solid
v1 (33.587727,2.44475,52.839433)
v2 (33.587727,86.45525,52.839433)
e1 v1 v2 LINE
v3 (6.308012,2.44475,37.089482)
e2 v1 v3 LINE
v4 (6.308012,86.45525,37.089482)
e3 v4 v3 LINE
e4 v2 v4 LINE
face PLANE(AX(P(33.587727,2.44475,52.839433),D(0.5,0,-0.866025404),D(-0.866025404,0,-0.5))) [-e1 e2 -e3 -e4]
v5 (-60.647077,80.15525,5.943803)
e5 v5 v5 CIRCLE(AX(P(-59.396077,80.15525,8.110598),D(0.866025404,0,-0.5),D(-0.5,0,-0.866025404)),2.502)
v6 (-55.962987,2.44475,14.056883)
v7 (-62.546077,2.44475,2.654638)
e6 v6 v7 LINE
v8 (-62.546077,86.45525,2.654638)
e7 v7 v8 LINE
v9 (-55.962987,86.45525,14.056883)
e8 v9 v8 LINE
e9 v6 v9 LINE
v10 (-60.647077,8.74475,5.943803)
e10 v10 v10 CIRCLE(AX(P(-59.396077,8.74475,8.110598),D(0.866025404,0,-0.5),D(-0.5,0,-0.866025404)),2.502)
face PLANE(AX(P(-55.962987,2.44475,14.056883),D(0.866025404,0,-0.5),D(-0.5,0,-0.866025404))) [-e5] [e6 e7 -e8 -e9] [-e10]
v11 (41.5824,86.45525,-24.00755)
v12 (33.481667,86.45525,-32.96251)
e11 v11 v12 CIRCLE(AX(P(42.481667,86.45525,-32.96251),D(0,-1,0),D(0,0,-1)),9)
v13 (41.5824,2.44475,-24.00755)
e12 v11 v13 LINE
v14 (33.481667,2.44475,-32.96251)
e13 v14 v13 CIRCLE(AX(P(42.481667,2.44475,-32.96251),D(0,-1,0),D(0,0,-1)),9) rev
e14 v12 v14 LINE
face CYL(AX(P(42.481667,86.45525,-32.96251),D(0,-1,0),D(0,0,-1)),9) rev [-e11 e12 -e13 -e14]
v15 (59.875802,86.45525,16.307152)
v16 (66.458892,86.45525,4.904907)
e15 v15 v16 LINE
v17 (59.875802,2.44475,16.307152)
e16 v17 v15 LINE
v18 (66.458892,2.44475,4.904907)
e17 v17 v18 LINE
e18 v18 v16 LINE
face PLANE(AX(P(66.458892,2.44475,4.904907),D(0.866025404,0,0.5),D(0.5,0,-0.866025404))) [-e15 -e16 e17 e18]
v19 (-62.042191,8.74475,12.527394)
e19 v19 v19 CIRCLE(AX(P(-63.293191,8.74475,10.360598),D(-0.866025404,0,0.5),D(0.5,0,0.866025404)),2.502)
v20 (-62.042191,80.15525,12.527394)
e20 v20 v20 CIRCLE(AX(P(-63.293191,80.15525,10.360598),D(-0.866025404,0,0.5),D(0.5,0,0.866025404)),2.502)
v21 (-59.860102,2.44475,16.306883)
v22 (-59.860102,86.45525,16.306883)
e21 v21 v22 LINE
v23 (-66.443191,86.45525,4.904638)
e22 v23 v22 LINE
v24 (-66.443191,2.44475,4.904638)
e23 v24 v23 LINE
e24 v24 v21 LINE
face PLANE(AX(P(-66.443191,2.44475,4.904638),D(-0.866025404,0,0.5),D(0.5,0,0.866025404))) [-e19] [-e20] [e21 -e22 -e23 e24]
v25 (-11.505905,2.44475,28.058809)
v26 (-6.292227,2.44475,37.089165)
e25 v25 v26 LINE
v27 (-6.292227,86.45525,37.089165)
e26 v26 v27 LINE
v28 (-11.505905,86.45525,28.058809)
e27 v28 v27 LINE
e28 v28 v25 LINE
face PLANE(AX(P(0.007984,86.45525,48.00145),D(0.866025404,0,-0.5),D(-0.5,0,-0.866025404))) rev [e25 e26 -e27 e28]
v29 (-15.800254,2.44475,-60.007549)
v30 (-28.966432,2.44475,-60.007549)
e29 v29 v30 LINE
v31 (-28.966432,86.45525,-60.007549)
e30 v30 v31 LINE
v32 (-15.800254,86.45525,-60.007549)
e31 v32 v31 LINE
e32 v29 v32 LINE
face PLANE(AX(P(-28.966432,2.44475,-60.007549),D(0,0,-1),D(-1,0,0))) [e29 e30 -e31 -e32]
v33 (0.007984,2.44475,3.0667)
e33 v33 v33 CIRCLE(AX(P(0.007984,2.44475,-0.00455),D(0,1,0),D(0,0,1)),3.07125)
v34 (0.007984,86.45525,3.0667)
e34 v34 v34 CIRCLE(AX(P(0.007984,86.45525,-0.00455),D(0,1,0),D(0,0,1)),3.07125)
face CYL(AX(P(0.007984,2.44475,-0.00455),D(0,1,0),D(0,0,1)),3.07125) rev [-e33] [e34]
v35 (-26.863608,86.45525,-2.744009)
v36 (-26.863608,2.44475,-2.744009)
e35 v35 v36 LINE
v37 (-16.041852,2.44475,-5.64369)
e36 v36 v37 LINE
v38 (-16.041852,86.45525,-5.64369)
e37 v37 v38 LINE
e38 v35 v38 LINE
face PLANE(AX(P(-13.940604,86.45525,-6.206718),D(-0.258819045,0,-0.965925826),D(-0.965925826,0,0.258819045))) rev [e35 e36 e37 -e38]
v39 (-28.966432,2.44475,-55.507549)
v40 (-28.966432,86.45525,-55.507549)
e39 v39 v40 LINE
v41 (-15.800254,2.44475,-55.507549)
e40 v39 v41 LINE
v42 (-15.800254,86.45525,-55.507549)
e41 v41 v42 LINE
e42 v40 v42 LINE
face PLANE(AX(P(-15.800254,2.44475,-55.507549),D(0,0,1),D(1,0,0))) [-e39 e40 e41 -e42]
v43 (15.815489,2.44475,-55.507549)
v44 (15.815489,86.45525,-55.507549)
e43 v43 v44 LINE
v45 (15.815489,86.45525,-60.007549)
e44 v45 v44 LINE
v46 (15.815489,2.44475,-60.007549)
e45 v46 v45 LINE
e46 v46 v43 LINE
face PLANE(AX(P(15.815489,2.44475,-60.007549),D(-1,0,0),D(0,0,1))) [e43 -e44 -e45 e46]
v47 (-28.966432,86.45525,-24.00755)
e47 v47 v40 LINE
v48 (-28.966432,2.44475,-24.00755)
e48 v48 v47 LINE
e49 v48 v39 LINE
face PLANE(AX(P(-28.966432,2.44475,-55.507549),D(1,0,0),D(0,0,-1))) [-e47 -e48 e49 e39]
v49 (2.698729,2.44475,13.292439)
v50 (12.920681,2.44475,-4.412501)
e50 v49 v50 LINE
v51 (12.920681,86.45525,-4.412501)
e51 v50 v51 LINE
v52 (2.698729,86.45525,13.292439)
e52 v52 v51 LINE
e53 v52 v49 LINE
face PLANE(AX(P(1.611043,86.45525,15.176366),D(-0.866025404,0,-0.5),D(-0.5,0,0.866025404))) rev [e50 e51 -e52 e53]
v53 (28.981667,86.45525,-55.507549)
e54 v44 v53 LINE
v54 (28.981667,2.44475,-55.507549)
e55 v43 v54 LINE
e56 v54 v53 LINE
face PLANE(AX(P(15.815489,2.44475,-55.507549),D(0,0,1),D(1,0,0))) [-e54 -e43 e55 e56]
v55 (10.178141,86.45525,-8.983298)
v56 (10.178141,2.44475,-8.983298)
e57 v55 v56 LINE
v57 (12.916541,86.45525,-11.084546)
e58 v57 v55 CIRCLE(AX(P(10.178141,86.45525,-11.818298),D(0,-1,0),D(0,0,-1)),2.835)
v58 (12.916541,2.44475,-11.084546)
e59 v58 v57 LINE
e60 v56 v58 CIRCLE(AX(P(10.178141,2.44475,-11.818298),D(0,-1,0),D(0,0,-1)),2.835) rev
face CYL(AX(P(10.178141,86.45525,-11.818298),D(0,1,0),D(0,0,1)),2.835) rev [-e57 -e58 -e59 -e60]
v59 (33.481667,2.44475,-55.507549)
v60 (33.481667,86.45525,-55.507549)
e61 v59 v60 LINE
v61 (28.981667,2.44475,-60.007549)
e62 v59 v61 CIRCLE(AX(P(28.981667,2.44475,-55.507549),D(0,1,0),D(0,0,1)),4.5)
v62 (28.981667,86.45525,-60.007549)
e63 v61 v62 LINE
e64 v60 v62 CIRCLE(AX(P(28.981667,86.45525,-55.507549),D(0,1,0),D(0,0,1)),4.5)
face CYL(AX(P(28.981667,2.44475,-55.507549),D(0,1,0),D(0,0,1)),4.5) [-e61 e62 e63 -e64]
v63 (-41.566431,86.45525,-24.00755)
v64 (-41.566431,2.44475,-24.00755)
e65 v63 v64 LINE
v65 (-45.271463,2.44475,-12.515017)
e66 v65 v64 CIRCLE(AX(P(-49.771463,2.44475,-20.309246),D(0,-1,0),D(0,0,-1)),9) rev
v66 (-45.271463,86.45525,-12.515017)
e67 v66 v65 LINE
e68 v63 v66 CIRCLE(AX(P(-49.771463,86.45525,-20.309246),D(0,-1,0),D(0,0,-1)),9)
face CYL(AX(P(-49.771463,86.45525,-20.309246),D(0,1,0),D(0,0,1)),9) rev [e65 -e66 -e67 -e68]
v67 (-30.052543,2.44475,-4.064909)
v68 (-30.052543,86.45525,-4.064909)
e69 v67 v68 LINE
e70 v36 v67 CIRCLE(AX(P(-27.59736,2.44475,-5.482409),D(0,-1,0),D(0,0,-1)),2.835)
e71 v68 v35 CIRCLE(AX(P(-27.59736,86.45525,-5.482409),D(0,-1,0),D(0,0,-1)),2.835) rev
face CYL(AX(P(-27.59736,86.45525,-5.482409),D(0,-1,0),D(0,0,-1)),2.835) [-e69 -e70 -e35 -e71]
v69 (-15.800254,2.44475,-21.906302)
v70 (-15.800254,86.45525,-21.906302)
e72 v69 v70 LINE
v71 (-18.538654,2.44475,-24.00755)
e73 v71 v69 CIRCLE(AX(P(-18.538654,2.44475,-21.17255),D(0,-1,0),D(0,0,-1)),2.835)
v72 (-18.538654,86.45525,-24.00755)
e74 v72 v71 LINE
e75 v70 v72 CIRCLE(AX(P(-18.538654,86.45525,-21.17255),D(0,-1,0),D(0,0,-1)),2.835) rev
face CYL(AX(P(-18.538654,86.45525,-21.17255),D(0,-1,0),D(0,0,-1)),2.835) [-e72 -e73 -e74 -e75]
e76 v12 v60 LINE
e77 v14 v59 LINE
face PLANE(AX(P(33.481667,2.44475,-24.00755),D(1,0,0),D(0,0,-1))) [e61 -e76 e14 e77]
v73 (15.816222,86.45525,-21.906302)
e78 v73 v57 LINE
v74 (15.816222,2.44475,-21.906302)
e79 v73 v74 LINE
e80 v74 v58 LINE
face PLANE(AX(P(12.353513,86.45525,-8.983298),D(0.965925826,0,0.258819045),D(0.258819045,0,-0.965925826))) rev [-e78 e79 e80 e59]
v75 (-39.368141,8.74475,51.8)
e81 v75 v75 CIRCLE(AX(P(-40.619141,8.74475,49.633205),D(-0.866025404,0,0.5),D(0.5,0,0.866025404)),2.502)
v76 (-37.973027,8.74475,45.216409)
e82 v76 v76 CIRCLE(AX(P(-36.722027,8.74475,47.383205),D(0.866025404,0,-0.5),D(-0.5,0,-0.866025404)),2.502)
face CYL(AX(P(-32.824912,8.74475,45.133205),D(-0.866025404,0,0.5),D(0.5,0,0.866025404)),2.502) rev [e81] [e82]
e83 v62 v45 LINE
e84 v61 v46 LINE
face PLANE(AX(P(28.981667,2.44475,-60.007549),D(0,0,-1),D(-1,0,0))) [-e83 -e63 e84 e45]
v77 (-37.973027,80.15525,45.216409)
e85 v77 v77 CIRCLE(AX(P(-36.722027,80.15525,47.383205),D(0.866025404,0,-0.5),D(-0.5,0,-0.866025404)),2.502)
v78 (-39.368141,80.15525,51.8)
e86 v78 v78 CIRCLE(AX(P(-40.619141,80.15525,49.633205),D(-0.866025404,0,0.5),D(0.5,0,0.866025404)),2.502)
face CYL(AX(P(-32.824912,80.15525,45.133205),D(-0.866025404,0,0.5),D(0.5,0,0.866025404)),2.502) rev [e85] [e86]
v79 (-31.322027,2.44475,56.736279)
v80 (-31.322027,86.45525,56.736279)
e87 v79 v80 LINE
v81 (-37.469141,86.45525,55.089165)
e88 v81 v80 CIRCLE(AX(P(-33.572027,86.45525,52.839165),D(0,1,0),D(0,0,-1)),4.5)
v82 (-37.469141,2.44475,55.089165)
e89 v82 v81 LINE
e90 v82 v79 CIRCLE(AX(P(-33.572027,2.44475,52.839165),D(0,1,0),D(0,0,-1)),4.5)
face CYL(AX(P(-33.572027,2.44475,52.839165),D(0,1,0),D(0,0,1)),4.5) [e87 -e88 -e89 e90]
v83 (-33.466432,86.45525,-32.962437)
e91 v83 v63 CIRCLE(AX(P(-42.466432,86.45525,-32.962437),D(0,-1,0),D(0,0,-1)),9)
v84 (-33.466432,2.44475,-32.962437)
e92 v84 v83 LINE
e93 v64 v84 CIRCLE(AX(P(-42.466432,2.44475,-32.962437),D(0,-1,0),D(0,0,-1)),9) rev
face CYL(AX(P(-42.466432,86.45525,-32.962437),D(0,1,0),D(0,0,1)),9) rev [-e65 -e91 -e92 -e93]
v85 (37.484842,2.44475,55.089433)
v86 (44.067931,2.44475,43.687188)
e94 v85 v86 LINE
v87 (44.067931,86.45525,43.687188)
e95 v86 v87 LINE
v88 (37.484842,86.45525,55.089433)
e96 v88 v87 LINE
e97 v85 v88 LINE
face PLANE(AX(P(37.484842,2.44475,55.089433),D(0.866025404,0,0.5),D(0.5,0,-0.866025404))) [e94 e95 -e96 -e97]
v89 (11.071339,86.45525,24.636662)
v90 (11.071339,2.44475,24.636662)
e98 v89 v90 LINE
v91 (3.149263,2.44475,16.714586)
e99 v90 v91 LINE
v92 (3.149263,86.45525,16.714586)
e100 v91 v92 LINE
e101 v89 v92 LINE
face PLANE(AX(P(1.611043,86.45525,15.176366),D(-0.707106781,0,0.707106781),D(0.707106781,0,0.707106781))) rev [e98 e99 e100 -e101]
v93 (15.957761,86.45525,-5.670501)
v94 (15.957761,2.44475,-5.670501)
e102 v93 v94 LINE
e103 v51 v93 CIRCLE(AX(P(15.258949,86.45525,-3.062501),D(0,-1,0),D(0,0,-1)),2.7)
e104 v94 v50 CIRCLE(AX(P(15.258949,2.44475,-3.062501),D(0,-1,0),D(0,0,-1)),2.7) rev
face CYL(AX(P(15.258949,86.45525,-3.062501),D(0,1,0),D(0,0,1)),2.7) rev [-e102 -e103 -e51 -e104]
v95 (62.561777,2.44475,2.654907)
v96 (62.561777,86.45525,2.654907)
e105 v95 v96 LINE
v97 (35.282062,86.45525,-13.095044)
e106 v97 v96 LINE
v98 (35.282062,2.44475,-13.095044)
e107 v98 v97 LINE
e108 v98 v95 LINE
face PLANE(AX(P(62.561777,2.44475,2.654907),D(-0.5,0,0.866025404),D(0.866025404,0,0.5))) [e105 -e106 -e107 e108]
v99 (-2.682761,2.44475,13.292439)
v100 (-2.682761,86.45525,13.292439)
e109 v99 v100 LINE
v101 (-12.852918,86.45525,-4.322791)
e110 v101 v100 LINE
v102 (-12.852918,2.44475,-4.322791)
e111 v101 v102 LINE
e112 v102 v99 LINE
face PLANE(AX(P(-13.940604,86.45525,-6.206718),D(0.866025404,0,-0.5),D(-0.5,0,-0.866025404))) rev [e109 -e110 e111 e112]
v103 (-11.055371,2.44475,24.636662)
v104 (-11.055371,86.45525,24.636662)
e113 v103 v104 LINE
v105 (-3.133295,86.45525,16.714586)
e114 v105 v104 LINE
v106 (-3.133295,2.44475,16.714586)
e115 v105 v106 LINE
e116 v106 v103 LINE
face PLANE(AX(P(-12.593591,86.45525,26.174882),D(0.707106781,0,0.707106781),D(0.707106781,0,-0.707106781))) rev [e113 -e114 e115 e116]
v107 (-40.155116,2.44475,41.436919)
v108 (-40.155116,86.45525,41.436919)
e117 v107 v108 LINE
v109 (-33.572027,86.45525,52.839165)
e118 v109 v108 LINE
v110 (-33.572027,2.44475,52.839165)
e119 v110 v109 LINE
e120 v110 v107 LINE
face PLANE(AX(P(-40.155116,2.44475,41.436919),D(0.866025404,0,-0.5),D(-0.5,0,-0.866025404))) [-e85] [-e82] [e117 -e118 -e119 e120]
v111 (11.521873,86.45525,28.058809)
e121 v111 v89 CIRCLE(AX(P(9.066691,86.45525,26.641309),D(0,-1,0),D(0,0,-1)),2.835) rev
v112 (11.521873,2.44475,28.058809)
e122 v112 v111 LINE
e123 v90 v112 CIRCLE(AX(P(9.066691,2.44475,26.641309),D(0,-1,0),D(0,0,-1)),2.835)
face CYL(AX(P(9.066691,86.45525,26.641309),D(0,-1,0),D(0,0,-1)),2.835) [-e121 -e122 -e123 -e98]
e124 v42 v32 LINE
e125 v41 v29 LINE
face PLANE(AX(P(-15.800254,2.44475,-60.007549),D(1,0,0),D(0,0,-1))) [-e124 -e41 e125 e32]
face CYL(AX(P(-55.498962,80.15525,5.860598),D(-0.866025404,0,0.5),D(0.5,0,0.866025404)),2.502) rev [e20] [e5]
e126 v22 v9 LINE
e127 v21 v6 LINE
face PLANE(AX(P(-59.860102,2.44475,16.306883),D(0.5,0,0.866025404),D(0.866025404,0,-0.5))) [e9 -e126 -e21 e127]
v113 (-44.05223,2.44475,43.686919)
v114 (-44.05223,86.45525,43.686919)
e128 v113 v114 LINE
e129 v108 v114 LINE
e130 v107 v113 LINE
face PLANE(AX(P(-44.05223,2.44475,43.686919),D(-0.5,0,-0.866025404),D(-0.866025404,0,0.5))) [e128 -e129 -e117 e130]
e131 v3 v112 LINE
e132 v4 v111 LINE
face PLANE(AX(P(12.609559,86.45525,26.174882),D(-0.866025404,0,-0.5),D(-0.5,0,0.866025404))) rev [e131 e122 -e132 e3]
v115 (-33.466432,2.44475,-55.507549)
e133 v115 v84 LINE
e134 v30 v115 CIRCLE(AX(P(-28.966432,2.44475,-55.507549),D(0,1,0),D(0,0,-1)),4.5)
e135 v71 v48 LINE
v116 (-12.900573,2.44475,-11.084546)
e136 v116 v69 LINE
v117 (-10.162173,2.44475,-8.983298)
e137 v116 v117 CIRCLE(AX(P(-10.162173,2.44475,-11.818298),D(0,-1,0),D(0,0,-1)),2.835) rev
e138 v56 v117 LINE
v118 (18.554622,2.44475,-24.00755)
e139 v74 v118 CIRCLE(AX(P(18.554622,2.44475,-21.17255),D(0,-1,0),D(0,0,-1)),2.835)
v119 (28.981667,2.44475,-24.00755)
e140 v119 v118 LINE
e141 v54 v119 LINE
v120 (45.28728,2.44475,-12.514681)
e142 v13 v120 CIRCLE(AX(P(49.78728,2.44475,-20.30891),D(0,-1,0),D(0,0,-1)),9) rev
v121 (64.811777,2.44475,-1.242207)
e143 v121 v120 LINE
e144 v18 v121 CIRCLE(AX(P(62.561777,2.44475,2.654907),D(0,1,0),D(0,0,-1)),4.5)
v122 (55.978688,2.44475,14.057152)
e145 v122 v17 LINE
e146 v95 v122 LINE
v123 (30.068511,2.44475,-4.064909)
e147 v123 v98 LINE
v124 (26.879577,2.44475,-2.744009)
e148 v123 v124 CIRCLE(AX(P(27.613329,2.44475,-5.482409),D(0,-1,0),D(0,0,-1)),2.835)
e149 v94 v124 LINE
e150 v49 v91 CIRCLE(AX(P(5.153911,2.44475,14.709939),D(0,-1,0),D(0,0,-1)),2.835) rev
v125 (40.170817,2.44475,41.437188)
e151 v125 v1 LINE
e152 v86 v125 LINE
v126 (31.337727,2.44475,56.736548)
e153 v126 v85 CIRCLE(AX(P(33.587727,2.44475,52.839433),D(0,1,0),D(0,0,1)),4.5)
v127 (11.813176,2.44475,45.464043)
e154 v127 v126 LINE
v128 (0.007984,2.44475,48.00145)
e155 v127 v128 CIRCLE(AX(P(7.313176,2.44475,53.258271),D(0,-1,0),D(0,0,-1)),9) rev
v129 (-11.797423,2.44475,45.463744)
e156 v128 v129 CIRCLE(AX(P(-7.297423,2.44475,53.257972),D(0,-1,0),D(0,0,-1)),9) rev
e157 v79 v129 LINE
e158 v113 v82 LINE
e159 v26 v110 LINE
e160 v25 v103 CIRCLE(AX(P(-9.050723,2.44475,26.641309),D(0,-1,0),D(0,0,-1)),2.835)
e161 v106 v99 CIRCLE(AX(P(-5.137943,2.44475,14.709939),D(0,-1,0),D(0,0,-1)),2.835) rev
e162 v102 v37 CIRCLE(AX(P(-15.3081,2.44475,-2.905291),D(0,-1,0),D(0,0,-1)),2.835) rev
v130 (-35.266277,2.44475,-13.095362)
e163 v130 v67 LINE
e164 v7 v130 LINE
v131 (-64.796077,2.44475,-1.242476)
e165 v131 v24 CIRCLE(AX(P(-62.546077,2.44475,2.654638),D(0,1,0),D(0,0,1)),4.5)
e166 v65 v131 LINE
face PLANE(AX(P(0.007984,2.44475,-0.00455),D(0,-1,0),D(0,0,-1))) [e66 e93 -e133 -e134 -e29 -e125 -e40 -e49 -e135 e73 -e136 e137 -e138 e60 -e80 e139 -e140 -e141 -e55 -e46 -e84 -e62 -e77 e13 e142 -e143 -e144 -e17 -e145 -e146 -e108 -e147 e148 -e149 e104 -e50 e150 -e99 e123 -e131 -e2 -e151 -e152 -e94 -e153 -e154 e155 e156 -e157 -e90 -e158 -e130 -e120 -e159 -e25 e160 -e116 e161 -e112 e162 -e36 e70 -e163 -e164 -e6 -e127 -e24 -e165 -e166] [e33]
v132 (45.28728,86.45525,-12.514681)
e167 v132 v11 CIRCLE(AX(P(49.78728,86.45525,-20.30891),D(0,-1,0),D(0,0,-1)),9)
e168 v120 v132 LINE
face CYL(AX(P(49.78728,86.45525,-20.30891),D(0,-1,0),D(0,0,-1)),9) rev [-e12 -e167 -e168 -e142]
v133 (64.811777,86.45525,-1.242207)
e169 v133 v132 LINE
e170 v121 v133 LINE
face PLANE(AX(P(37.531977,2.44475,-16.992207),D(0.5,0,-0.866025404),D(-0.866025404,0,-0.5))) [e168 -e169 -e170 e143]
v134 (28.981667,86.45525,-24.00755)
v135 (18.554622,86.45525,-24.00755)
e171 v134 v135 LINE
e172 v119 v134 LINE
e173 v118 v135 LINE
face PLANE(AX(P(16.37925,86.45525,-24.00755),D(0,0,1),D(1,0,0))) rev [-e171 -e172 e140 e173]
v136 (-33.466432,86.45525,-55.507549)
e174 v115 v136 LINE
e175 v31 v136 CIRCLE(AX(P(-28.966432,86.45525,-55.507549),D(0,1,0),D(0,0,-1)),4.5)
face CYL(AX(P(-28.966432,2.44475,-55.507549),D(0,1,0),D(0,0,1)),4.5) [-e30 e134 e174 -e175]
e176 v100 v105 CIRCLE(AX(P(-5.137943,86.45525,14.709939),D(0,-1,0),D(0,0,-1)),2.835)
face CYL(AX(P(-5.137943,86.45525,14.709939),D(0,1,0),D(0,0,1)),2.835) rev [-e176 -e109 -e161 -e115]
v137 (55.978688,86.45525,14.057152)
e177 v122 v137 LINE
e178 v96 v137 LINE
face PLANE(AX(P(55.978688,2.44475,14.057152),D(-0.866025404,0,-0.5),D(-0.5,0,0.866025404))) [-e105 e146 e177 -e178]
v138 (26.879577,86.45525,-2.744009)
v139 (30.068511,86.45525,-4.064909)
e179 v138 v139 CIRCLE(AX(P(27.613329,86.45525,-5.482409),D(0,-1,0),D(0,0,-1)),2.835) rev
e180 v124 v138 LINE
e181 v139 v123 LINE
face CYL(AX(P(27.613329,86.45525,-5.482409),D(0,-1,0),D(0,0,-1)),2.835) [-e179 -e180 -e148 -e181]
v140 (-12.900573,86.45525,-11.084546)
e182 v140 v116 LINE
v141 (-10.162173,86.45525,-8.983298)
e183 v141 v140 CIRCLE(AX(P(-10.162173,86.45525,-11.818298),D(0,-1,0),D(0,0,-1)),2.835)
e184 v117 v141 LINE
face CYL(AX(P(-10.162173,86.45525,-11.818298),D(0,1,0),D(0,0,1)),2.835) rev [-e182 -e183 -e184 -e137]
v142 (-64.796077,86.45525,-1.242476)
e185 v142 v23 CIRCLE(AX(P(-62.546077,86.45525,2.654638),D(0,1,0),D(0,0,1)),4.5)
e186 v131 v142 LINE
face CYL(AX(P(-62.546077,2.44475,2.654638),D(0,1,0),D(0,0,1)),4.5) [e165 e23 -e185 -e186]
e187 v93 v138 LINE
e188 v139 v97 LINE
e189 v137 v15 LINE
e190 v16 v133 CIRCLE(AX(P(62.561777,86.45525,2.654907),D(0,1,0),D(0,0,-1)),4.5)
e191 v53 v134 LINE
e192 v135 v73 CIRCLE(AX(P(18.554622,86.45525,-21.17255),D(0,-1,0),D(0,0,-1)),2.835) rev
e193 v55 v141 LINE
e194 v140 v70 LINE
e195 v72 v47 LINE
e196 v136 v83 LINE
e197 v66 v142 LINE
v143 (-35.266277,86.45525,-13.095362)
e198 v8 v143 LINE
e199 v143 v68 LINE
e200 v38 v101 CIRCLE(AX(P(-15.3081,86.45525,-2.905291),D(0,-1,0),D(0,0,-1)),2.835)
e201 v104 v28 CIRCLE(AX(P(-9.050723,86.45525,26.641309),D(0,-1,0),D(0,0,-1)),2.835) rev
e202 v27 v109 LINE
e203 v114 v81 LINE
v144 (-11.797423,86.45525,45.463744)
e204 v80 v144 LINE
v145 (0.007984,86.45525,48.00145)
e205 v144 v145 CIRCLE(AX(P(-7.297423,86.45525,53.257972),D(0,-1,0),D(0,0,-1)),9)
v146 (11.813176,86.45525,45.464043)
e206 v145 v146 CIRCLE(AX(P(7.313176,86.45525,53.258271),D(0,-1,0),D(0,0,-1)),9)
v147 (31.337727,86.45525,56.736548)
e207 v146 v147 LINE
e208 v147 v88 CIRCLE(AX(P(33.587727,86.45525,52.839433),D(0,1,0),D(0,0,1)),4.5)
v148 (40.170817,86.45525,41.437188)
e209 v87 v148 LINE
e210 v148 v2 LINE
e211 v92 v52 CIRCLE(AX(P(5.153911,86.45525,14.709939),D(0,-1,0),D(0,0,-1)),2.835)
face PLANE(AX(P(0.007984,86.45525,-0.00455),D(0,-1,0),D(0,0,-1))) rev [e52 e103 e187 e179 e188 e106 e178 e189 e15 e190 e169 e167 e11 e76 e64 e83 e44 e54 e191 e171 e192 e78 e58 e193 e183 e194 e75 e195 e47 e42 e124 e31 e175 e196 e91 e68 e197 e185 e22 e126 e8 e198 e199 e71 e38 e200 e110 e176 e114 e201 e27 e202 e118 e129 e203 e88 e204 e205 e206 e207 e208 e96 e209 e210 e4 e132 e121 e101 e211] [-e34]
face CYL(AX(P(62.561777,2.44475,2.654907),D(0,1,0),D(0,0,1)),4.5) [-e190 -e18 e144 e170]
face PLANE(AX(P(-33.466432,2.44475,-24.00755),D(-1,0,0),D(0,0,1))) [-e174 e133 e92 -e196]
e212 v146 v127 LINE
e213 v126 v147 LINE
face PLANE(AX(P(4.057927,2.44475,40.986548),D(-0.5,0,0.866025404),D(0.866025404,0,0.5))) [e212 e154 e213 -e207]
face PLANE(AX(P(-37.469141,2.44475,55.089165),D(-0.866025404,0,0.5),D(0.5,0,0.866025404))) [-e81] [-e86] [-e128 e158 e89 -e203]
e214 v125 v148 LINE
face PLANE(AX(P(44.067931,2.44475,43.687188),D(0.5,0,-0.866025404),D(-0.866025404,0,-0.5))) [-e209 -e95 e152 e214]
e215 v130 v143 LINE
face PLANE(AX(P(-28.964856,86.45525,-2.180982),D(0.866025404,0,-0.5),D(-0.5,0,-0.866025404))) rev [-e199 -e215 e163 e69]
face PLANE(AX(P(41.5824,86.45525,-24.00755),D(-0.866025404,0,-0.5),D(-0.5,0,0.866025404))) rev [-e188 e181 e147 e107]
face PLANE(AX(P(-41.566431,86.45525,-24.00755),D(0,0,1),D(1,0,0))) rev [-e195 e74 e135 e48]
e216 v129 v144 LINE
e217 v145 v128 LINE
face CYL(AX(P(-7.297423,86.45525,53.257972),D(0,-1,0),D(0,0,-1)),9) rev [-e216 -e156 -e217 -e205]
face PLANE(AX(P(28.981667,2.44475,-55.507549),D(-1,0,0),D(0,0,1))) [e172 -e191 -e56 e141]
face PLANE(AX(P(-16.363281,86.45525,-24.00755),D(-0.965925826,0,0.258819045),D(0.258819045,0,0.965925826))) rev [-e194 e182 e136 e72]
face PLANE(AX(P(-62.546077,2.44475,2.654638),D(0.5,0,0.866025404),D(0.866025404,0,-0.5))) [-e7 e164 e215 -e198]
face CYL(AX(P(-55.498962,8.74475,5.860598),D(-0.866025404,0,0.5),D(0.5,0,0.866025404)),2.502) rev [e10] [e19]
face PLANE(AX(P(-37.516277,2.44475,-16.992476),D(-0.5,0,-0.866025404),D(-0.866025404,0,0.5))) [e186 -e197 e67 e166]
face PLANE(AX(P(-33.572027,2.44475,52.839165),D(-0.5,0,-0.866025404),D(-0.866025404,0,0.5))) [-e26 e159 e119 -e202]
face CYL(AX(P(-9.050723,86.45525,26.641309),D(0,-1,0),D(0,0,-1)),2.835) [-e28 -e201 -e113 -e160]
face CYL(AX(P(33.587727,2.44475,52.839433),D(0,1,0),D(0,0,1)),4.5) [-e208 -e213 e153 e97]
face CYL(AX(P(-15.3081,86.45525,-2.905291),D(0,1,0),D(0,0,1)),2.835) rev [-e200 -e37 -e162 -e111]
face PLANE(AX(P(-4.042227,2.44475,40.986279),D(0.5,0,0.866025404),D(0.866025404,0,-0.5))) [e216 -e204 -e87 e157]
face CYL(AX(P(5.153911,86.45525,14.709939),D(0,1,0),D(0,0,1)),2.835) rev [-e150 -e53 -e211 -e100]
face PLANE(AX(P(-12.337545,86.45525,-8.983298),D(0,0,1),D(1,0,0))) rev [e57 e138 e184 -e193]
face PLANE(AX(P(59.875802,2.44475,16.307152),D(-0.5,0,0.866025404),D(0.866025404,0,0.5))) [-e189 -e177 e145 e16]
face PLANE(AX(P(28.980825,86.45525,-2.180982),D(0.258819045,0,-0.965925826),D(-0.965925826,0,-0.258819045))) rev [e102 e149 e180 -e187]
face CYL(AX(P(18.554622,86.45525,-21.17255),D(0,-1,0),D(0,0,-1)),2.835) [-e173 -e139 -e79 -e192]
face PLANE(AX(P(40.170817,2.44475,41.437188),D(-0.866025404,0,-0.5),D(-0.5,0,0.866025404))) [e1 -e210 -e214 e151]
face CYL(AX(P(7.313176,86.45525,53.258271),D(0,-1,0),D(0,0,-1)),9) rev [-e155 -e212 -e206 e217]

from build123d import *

# Parameters (mm, degrees)
SALIENTE_EXTRUIR1_DEPTH = 88.9
CROQUIS4_R              = 3.25
CORTAR_EXTRUIR1_DEPTH   = 112.44204772
REDONDEO6_R             = 3
REDONDEO7_R             = 3
ESCALA2_SCALE           = 1.05
SALIENTE_EXTRUIR2_DEPTH = 93.345
REDONDEO8_R             = 10
REDONDEO9_R             = 10
REDONDEO12_R            = 10
REDONDEO13_R            = 10
REDONDEO14_R            = 10
REDONDEO16_R            = 10
REDONDEO17_R            = 3
CROQUIS20_R             = 2.78
CORTAR_EXTRUIR7_DEPTH   = 10
ESCALA3_SCALE           = 0.9


with BuildPart() as part:
    # Croquis1 → Saliente-Extruir1 (new body)
    with BuildSketch(Plane(origin=(0, 0, 0), x_dir=(1, 0, 0), z_dir=(0, 1, 0))):
        Polygon((1.696358741, -16.064461222), (13.335, -27.703102481), (0, -50.8), (-13.335, -27.703102481), (-1.696358741, -16.064461222), (-14.760410887, 6.563140847), (-30.659090512, 2.303102481), (-43.994090512, 25.4), (-17.324090512, 25.4), (-13.064052146, 9.501320374), (13.064052146, 9.501320374), (17.324090512, 25.4), (43.994090512, 25.4), (30.659090512, 2.303102481), (14.760410887, 6.563140847), align=None)
    extrude(amount=SALIENTE_EXTRUIR1_DEPTH)

    # Croquis4 → Cortar-Extruir1 (cut, through all)
    with BuildSketch(Plane(origin=(0, 88.9, 0), x_dir=(1, 0, 0), z_dir=(0, 1, 0))):
        with Locations(Location((0, 0, 0), (0, 0, 270))):
            Circle(CROQUIS4_R)
    extrude(amount=-CORTAR_EXTRUIR1_DEPTH, mode=Mode.SUBTRACT)

    # Redondeo6
    redondeo6_edges = [part.edges().sort_by_distance(p)[0] for p in [
        (-1.696358741, 44.45, 16.064461222),
        (-14.760410887, 44.45, -6.563140847),
        (-13.064052146, 44.45, -9.501320374),
        (13.064052146, 44.45, -9.501320374),
        (1.696358741, 44.45, 16.064461222),
    ]]
    fillet(redondeo6_edges, radius=REDONDEO6_R)

    # Redondeo7
    redondeo7_edges = [part.edges().sort_by_distance(p)[0] for p in [
        (-13.335, 44.45, 27.703102481),
        (-30.659090512, 44.45, -2.303102481),
        (-17.324090512, 44.45, -25.4),
        (17.324090512, 44.45, -25.4),
        (30.659090512, 44.45, -2.303102481),
        (13.335, 44.45, 27.703102481),
    ]]
    fillet(redondeo7_edges, radius=REDONDEO7_R)


with BuildPart() as part_1:
    # Escala2: scaled about (-0.00814633, 44.45, 0.003262785)
    add(part.part.scale(ESCALA2_SCALE).moved(Location((0.000407317, -2.2225, -0.000163139))))

    # Croquis9 → Saliente-Extruir2 (add, through all)
    with BuildSketch(Plane(origin=(0, 91.1225, 0), x_dir=(1, 0, 0), z_dir=(0, 1, 0))):
        with BuildLine():
            Line((-37.193388788, 26.670163139), (-37.193388788, 61.670162712))
            ThreePointArc((-37.193388788, 61.670162712), (-35.728922694, 65.205696618), (-32.193388788, 66.670162712))
            Line((-32.193388788, 66.670162712), (-17.564301381, 66.670162712))
            Line((-17.564301381, 66.670162712), (-17.564301381, 61.670162712))
            Line((-17.564301381, 61.670162712), (-32.193388788, 61.670162712))
            Line((-32.193388788, 61.670162712), (-32.193388788, 26.670163139))
            Line((-32.193388788, 26.670163139), (-37.193388788, 26.670163139))
        make_face()
        with BuildLine():
            Line((-69.504104547, -2.954490104), (-39.193215784, 14.545509683))
            Line((-39.193215784, 14.545509683), (-41.693215784, 18.875636702))
            Line((-41.693215784, 18.875636702), (-72.004104547, 1.375636915))
            ThreePointArc((-72.004104547, 1.375636915), (-74.333733678, -1.660394878), (-73.834231566, -5.454490104))
            Line((-73.834231566, -5.454490104), (-66.519687862, -18.123651433))
            Line((-66.519687862, -18.123651433), (-62.189560843, -15.623651433))
            Line((-62.189560843, -15.623651433), (-69.504104547, -2.954490104))
        make_face()
        with BuildLine():
            Line((32.193388788, 61.670162712), (32.193388788, 26.670163139))
            Line((32.193388788, 26.670163139), (37.193388788, 26.670163139))
            Line((37.193388788, 26.670163139), (37.193388788, 61.670162712))
            ThreePointArc((37.193388788, 61.670162712), (35.728922694, 65.205696618), (32.193388788, 66.670162712))
            Line((32.193388788, 66.670162712), (17.564301381, 66.670162712))
            Line((17.564301381, 66.670162712), (17.564301381, 61.670162712))
            Line((17.564301381, 61.670162712), (32.193388788, 61.670162712))
        make_face()
        with BuildLine():
            Line((39.193733196, 14.545210955), (41.693733196, 18.875337974))
            Line((41.693733196, 18.875337974), (72.004621958, 1.375338188))
            ThreePointArc((72.004621958, 1.375338188), (74.33425109, -1.660693606), (73.834748977, -5.454788831))
            Line((73.834748977, -5.454788831), (66.520205273, -18.123950161))
            Line((66.520205273, -18.123950161), (62.190078254, -15.623950161))
            Line((62.190078254, -15.623950161), (69.504621958, -2.954788831))
            Line((69.504621958, -2.954788831), (39.193733196, 14.545210955))
        make_face()
        with BuildLine():
            Line((37.31123317, -58.715373881), (7.000344407, -41.215374094))
            Line((7.000344407, -41.215374094), (4.500344407, -45.545501113))
            Line((4.500344407, -45.545501113), (34.81123317, -63.0455009))
            ThreePointArc((34.81123317, -63.0455009), (38.605328395, -63.545003012), (41.641360189, -61.215373881))
            Line((41.641360189, -61.215373881), (48.955903893, -48.546212551))
            Line((48.955903893, -48.546212551), (44.625776874, -46.046212551))
            Line((44.625776874, -46.046212551), (37.31123317, -58.715373881))
        make_face()
        with BuildLine():
            Line((-6.999826996, -41.215075367), (-4.499826996, -45.545202386))
            Line((-4.499826996, -45.545202386), (-34.810715758, -63.045202172))
            ThreePointArc((-34.810715758, -63.045202172), (-38.604810984, -63.544704284), (-41.640842777, -61.215075153))
            Line((-41.640842777, -61.215075153), (-48.955386481, -48.545913824))
            Line((-48.955386481, -48.545913824), (-44.625259462, -46.045913824))
            Line((-44.625259462, -46.045913824), (-37.310715758, -58.715075153))
            Line((-37.310715758, -58.715075153), (-6.999826996, -41.215075367))
        make_face()
    extrude(amount=-SALIENTE_EXTRUIR2_DEPTH)

    # Redondeo8
    # the kernel refuses this fillet: 10 mm, written as the material it adds along each edge
    with BuildSketch(Plane(origin=(-37.193388788, 91.1225, -26.670163139), x_dir=(-1, 0, 0), z_dir=(0, -1, 0))) as redondeo8_piece_1_section:
        with BuildLine():
            CenterArc((10, 9.949874264), REDONDEO8_R, 180, 84.260823378)
            Line((0, 9.949874264), (-0.2, 9.949874264))
            Line((-0.2, 9.949874264), (-0.2, 0))
            Line((-0.2, 0), (0, -0.2))
            ThreePointArc((0, -0.2), (4.499999466, -0.2), (8.979998912, -0.198997485))
            Line((8.979998912, -0.198997485), (8.999998933, 0))
        make_face()
    redondeo8_piece_1 = extrude(amount=93.345, mode=Mode.PRIVATE)
    redondeo8_piece_1 = split(redondeo8_piece_1, bisect_by=Plane(origin=(-45.471806186, 44.45, -25.420347259), z_dir=(0.8660254037844427, 0, -0.49999999999999306)), keep=Keep.TOP, mode=Mode.PRIVATE)
    add(redondeo8_piece_1)

    # Redondeo9
    # the kernel refuses this fillet: 10 mm, written as the material it adds along each edge
    with BuildSketch(Plane(origin=(37.193388788, 91.1225, -26.670163139), x_dir=(0, 0, -1), z_dir=(0, -1, 0))) as redondeo9_piece_1_section:
        with BuildLine():
            CenterArc((9.949956104, 10), REDONDEO9_R, 185.734485624, 84.265514376)
            Line((0, 9.000813566), (-0.198999122, 8.980829837))
            ThreePointArc((-0.198999122, 8.980829837), (-0.2, 4.500406783), (-0.2, 0))
            Line((-0.2, 0), (0, -0.2))
            Line((0, -0.2), (9.949956104, -0.2))
            Line((9.949956104, -0.2), (9.949956104, 0))
        make_face()
    redondeo9_piece_1 = extrude(amount=93.345, mode=Mode.PRIVATE)
    redondeo9_piece_1 = split(redondeo9_piece_1, bisect_by=Plane(origin=(45.472441412, 44.45, -25.420036516), z_dir=(-0.8660254037844312, 0, -0.5000000000000131)), keep=Keep.TOP, mode=Mode.PRIVATE)
    add(redondeo9_piece_1)

    # Redondeo12
    # the kernel refuses this fillet: 10 mm, written as the material it adds along each edge
    with BuildSketch(Plane(origin=(4.500437971, 91.1225, 45.545555132), x_dir=(0.8660254037844384, 0, 0.5000000000000003), z_dir=(0, -1, 0))) as redondeo12_piece_1_section:
        with BuildLine():
            CenterArc((9.949880533, 10), REDONDEO12_R, 185.738817437, 84.261182563)
            Line((0, 9.000061308), (-0.198997611, 8.980062535))
            ThreePointArc((-0.198997611, 8.980062535), (-0.2, 4.500030654), (-0.2, 0))
            Line((-0.2, 0), (0, -0.2))
            Line((0, -0.2), (9.949880533, -0.2))
            Line((9.949880533, -0.2), (9.949880533, 0))
        make_face()
    redondeo12_piece_1 = extrude(amount=93.345, mode=Mode.PRIVATE)
    redondeo12_piece_1 = split(redondeo12_piece_1, bisect_by=Plane(origin=(-0.721187955, 44.45, 52.089997188), z_dir=(0.8660254037844385, 0, -0.5000000000000004)), keep=Keep.TOP, mode=Mode.PRIVATE)
    add(redondeo12_piece_1)

    # Redondeo13
    # the kernel refuses this fillet: 10 mm, written as the material it adds along each edge
    with BuildSketch(Plane(origin=(41.693826759, 91.1225, -18.875283955), x_dir=(0.500000000000013, 0, -0.8660254037844312), z_dir=(0, -1, 0))) as redondeo13_piece_1_section:
        with BuildLine():
            CenterArc((10, 9.94994984), REDONDEO13_R, 180, 84.265155193)
            Line((0, 9.94994984), (-0.2, 9.94994984))
            Line((-0.2, 9.94994984), (-0.2, 0))
            Line((-0.2, 0), (0, -0.2))
            ThreePointArc((0, -0.2), (4.500375595, -0.2), (8.980766214, -0.198998997))
            Line((8.980766214, -0.198998997), (9.00075119, 0))
        make_face()
    redondeo13_piece_1 = extrude(amount=93.345, mode=Mode.PRIVATE)
    redondeo13_piece_1 = redondeo13_piece_1 - Plane(origin=(47.193388788, 44.45, -36.620119243), x_dir=(0, 0, -1), z_dir=(0, 1, 0)) * Cylinder(10, 227, mode=Mode.PRIVATE)
    add(redondeo13_piece_1)

    # Redondeo14
    # the kernel refuses this fillet: 10 mm, written as the material it adds along each edge
    with BuildSketch(Plane(origin=(-4.499826996, 91.1225, 45.545202386), x_dir=(0.4999999999984365, 0, 0.8660254037853413), z_dir=(0, -1, 0))) as redondeo14_piece_1_section:
        with BuildLine():
            CenterArc((10, 9.949921458), REDONDEO14_R, 180, 84.263528066)
            Line((0, 9.949921459), (-0.2, 9.949921459))
            Line((-0.2, 9.949921459), (-0.2, 0))
            Line((-0.2, 0), (0, -0.2))
            ThreePointArc((0, -0.2), (4.500234312, -0.2), (8.980477997, -0.198998429))
            Line((8.980477997, -0.198998429), (9.000468625, 0))
        make_face()
    redondeo14_piece_1 = extrude(amount=93.345, mode=Mode.PRIVATE)
    redondeo14_piece_1 = redondeo14_piece_1 - Plane(origin=(8.117287277, 44.45, 59.180749436), x_dir=(0.866025403784329, 0, 0.50000000000019), z_dir=(0, 1, 0)) * Cylinder(10, 227, mode=Mode.PRIVATE)
    add(redondeo14_piece_1)

    # Redondeo16
    # the kernel refuses this fillet: 10 mm, written as the material it adds along each edge
    with BuildSketch(Plane(origin=(-41.693215784, 91.1225, -18.875636702), x_dir=(-0.8660254037844388, 0, 0.4999999999999999), z_dir=(0, -1, 0))) as redondeo16_piece_1_section:
        with BuildLine():
            CenterArc((9.949908926, 10), REDONDEO16_R, 185.737190303, 84.262809697)
            Line((0, 9.000343874), (-0.198998178, 8.980350751))
            ThreePointArc((-0.198998178, 8.980350751), (-0.2, 4.500171937), (-0.2, 0))
            Line((-0.2, 0), (0, -0.2))
            Line((0, -0.2), (9.949908926, -0.2))
            Line((9.949908926, -0.2), (9.949908926, 0))
        make_face()
    redondeo16_piece_1 = extrude(amount=93.345, mode=Mode.PRIVATE)
    redondeo16_piece_1 = redondeo16_piece_1 - Plane(origin=(-47.193388788, 44.45, -36.620037403), x_dir=(-1, 0, 0), z_dir=(0, 1, 0)) * Cylinder(10, 227, mode=Mode.PRIVATE)
    add(redondeo16_piece_1)

    # Redondeo17
    redondeo17_edges = [part_1.edges().sort_by_distance(p)[0] for p in [
        (15.498838747, 44.45, -6.891461029),
    ]]
    fillet(redondeo17_edges, radius=REDONDEO17_R)

    # Croquis20 → Cortar-Extruir7 (cut)
    with BuildSketch(Plane(origin=(-57.737537171, 0, 33.334782628), x_dir=(0.5000000000000017, 0, 0.8660254037844378), z_dir=(-0.8660254037844377, 0, 0.5000000000000016))):
        with Locations((25.193388788, 4.7775)):
            Circle(CROQUIS20_R)
        with Locations((25.193388788, 84.1225)):
            Circle(CROQUIS20_R)
        with Locations((-25.193388788, 84.1225)):
            Circle(CROQUIS20_R)
        with Locations((-25.193388788, 4.7775)):
            Circle(CROQUIS20_R)
    extrude(amount=-CORTAR_EXTRUIR7_DEPTH, mode=Mode.SUBTRACT)


with BuildPart() as part_2:
    # Escala3: scaled about (0.076174525, 44.45, -0.044030198)
    add(part_1.part.scale(ESCALA3_SCALE).moved(Location((0.007617452, 4.445, -0.00440302))))


solid = part_2.part
